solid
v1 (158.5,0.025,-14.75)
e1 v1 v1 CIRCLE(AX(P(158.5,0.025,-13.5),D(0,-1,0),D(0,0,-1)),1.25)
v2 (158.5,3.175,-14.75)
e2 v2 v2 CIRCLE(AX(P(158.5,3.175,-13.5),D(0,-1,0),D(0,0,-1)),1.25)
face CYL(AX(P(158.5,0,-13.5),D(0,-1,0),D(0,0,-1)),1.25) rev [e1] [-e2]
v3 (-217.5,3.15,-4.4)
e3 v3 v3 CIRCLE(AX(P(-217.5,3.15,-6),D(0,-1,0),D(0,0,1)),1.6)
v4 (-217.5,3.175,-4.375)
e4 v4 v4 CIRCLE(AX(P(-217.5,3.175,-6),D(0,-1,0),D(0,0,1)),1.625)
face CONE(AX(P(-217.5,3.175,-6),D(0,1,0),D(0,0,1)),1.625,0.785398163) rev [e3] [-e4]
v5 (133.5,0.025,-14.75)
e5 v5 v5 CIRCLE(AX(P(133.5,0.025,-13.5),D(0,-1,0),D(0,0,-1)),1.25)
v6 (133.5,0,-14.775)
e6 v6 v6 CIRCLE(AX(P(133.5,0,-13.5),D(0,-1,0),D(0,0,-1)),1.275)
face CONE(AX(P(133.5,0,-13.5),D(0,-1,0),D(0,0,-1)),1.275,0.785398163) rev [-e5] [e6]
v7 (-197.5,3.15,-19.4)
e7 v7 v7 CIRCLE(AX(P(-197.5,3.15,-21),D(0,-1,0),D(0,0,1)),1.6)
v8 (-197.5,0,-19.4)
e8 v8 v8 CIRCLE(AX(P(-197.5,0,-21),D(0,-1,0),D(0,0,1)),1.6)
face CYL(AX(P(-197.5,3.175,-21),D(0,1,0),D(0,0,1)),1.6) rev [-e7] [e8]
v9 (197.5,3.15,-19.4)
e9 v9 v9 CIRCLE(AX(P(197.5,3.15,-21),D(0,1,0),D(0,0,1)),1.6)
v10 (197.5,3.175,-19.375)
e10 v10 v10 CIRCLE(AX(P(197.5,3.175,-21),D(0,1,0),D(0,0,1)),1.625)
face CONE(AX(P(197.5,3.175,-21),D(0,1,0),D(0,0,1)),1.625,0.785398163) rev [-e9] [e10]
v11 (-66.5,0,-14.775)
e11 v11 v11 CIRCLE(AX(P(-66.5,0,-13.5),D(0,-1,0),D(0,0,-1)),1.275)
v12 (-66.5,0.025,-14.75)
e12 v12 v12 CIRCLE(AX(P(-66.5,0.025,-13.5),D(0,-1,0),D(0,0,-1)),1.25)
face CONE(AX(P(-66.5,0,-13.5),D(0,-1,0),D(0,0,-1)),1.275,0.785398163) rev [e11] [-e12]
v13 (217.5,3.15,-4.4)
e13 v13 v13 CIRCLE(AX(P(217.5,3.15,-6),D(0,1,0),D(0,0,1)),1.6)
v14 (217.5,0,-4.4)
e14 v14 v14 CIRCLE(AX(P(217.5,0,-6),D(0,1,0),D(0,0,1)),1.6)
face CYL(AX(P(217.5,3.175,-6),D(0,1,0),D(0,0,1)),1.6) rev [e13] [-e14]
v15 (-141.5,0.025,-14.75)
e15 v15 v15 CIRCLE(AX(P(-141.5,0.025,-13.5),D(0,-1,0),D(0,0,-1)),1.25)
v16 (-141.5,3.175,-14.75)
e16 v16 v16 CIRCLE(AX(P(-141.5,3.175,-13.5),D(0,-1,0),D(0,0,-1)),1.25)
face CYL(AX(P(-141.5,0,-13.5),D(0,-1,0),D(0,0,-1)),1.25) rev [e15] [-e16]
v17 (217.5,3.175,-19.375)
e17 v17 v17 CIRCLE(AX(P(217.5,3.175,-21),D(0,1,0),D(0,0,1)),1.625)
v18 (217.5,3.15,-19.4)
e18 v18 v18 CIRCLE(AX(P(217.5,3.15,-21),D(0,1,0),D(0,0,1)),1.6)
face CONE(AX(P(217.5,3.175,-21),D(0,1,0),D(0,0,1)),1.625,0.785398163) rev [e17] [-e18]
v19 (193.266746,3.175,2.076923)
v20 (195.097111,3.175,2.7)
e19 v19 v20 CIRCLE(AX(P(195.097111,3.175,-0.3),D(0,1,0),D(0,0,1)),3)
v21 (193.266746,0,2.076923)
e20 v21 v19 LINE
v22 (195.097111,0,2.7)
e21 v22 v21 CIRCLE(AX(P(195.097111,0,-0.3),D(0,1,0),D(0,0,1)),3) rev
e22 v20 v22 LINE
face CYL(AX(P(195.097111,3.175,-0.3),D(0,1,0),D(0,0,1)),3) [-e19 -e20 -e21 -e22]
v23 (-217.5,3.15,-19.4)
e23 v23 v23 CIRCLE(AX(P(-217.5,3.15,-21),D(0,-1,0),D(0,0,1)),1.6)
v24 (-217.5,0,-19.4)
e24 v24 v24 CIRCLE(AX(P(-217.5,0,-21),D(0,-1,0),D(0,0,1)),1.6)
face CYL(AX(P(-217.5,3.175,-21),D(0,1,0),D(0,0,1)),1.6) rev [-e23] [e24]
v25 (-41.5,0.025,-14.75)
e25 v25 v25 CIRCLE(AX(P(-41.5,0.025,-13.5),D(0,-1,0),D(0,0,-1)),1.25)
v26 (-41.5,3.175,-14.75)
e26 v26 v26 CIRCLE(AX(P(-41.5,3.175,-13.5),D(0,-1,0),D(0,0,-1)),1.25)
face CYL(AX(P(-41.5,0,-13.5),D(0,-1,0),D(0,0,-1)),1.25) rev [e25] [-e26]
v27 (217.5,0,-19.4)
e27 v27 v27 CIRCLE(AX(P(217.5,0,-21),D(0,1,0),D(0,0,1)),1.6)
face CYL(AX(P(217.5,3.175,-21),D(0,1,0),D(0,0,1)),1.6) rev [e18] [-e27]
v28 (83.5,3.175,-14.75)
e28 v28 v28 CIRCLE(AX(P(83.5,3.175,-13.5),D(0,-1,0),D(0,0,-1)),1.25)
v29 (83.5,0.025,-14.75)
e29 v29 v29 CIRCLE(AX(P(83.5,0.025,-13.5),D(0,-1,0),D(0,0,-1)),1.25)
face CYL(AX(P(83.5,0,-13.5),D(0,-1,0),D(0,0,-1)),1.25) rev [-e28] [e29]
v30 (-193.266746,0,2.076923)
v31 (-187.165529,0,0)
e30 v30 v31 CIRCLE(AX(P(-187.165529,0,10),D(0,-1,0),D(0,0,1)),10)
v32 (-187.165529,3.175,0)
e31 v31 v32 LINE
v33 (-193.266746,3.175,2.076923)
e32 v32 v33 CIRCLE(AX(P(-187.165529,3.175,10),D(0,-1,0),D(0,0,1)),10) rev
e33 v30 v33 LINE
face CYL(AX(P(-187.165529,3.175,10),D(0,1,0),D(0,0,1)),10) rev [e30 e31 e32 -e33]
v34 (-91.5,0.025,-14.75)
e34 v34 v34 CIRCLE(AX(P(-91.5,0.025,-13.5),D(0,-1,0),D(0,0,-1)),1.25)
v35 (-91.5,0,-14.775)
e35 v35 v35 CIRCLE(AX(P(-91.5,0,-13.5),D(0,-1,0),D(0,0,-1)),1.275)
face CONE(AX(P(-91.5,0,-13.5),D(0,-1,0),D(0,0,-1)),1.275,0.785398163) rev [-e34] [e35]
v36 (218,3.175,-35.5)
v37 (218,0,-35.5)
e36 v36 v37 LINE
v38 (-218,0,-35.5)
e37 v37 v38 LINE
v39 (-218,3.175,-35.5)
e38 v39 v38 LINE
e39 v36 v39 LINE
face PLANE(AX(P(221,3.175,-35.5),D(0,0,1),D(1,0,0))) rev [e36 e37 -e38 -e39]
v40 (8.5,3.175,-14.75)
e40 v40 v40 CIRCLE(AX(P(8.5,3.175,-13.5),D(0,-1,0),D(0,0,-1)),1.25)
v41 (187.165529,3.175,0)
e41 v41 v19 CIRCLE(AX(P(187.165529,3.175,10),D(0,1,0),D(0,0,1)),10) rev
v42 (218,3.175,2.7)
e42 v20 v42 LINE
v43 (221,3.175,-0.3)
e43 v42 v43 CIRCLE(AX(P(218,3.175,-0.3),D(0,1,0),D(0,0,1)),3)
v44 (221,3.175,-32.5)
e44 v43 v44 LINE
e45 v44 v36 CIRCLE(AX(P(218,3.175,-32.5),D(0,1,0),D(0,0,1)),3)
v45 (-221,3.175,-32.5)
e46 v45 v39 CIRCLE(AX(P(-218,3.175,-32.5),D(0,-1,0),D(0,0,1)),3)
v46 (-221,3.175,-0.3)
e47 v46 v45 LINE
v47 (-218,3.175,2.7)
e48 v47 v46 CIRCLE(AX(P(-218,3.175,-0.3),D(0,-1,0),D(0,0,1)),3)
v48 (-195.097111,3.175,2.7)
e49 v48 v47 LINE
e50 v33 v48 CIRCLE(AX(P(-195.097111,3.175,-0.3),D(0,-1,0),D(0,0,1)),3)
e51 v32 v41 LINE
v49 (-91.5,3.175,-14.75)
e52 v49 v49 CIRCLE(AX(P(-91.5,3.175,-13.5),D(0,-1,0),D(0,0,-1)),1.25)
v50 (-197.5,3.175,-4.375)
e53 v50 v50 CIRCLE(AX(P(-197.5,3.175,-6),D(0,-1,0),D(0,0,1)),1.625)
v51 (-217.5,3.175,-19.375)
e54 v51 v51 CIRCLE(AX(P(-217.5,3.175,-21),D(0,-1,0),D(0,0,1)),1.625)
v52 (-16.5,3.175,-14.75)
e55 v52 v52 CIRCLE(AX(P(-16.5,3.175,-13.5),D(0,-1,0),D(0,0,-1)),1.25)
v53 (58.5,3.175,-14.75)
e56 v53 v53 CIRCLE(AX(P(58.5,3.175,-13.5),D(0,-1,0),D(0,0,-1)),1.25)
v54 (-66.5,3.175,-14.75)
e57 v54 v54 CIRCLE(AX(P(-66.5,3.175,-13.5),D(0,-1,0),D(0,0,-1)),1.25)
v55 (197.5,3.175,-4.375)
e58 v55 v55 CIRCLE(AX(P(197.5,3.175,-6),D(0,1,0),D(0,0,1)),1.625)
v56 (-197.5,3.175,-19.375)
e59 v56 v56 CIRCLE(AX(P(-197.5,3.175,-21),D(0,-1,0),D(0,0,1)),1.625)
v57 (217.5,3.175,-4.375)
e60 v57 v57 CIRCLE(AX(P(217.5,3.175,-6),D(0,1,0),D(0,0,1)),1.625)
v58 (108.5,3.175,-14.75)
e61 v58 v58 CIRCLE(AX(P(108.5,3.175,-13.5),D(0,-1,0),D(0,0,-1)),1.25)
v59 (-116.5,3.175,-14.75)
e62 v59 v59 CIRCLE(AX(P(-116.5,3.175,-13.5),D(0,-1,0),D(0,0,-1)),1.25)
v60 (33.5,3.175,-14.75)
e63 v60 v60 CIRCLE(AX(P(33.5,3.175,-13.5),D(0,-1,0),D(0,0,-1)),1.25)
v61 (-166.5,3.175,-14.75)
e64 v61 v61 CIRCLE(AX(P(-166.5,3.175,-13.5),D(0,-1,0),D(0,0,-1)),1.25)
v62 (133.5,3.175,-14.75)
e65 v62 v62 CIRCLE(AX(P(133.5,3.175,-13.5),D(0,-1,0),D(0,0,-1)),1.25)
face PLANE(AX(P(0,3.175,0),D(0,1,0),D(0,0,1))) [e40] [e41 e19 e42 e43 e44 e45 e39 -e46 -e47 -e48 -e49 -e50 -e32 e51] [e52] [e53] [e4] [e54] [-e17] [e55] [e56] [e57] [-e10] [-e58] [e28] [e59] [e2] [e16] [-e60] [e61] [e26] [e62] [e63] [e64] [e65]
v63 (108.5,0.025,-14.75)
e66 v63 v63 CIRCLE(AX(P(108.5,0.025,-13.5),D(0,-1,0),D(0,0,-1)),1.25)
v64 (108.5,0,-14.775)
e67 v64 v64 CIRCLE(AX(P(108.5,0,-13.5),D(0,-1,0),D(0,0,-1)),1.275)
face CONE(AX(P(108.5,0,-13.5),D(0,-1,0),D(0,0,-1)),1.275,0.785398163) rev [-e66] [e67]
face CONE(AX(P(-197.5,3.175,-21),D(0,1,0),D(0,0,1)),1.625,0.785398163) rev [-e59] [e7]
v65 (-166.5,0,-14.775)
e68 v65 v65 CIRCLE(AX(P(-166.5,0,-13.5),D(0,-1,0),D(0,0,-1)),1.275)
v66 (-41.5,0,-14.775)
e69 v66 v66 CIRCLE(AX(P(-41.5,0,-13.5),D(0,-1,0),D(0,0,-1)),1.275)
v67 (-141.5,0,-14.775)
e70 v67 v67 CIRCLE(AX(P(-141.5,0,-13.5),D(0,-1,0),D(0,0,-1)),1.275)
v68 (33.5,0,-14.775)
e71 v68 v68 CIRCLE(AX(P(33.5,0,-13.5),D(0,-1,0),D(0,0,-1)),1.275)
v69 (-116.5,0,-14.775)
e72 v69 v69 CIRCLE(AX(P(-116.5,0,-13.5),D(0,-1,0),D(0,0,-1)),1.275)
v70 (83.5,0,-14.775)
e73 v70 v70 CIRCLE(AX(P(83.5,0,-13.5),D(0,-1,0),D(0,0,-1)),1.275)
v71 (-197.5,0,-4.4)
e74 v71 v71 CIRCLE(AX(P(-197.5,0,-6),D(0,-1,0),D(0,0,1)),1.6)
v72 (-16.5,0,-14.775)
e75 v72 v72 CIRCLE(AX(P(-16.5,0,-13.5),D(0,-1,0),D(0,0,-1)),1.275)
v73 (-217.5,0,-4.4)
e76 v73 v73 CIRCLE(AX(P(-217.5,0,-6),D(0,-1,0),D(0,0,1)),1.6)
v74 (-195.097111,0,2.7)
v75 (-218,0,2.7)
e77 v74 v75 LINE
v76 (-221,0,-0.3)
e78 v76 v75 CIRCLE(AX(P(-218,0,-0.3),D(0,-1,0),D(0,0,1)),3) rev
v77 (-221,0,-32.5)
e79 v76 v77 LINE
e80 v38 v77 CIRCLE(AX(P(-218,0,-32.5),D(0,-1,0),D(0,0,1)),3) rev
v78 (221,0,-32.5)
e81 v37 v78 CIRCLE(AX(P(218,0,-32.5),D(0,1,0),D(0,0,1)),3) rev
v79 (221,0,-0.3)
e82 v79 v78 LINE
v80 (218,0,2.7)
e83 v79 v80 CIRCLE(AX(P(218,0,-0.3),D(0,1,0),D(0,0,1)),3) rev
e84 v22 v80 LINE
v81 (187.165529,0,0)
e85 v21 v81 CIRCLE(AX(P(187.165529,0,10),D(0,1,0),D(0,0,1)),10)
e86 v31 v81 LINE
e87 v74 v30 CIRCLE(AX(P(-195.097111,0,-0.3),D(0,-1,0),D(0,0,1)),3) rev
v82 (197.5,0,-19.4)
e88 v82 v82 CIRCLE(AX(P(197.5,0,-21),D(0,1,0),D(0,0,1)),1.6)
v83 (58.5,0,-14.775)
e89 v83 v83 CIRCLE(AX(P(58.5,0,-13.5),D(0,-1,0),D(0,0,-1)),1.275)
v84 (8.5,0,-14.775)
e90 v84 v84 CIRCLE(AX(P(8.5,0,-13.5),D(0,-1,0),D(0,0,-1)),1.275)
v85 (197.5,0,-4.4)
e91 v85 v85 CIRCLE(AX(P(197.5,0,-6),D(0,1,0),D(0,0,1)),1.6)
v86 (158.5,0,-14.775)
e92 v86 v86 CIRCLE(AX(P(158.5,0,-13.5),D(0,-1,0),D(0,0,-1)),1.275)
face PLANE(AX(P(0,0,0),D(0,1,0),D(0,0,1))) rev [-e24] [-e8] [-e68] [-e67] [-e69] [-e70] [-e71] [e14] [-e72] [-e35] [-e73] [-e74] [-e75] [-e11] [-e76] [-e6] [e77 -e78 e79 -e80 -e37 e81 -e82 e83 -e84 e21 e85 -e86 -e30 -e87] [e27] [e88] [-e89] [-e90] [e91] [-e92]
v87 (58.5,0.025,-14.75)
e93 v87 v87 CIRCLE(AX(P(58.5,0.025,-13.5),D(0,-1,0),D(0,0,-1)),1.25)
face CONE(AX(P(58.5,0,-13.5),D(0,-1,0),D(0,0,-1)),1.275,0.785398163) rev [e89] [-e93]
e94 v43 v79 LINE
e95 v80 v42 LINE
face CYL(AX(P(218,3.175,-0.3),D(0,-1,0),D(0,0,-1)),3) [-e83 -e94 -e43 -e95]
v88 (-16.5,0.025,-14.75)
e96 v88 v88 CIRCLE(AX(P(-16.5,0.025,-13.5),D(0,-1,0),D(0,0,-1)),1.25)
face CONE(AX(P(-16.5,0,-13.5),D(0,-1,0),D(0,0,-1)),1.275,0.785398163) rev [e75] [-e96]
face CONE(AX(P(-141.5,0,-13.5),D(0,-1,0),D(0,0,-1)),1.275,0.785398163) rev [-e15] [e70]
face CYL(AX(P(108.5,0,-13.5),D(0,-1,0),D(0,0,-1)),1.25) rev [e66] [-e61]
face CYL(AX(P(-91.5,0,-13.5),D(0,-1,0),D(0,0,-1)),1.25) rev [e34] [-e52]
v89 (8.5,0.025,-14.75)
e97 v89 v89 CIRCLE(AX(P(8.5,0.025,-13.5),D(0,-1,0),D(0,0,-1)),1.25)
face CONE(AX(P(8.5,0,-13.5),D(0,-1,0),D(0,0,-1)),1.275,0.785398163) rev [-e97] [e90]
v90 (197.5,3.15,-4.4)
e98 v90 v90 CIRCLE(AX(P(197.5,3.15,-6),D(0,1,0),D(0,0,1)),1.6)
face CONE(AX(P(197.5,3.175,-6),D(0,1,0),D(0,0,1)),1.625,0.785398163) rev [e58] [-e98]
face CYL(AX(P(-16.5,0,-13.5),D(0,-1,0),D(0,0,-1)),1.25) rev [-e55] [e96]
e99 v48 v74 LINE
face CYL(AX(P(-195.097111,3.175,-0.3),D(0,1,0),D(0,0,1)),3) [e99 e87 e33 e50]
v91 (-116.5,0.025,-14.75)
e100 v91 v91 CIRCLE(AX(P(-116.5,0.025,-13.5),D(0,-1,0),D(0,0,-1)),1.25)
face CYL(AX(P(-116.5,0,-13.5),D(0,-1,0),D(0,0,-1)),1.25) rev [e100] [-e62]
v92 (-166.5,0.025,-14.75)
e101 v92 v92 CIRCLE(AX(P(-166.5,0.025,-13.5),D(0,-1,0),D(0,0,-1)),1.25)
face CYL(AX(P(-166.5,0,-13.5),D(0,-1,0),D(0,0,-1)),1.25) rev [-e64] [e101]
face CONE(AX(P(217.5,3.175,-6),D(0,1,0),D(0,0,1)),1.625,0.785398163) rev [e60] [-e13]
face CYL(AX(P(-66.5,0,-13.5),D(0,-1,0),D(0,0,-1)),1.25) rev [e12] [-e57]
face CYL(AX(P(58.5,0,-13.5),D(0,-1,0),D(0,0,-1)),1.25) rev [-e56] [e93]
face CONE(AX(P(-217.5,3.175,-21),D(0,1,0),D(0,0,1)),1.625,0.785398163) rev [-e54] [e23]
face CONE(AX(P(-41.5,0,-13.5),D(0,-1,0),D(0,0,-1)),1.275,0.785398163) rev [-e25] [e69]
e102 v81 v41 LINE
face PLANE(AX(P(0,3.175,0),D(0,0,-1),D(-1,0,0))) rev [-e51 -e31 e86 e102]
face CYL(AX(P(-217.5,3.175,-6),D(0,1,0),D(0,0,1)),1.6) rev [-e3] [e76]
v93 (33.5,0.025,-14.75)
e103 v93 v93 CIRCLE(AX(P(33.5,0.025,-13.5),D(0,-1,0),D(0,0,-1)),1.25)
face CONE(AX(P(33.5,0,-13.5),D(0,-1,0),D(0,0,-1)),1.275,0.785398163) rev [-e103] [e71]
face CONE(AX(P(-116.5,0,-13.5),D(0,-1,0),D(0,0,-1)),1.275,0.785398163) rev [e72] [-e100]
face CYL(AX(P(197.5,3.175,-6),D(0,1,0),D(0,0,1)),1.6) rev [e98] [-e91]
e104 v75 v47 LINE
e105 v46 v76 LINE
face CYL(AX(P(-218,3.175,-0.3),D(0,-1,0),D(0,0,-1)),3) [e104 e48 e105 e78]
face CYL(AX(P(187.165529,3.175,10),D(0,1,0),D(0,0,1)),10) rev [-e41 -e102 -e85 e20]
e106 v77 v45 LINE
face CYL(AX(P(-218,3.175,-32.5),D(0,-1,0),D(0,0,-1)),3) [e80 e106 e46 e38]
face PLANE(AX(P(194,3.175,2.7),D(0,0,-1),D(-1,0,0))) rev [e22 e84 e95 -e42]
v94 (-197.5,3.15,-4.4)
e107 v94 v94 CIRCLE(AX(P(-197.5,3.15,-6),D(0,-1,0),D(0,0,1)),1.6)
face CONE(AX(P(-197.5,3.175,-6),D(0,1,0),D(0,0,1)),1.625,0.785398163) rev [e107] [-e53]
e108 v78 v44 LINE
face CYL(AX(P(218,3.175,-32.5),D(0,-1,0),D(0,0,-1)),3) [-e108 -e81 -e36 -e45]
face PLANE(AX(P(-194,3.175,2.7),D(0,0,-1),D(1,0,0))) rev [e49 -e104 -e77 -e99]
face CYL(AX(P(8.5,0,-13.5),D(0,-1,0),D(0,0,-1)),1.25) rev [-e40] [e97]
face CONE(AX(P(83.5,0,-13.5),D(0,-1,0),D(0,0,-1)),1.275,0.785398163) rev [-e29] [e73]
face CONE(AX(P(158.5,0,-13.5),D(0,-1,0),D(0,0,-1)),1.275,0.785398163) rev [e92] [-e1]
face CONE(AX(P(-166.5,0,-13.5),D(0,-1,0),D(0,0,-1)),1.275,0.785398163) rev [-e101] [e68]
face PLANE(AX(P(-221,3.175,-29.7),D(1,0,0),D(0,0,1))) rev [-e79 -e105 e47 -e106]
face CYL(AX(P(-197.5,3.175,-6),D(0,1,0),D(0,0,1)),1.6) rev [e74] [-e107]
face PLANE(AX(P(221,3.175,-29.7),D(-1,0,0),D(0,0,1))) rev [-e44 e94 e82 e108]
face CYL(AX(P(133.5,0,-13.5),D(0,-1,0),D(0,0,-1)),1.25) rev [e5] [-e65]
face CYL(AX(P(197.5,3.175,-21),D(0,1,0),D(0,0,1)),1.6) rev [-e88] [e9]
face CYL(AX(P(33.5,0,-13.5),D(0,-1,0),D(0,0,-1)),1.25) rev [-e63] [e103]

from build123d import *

# Parameters (mm, degrees)
BOSS_EXTRUDE1_DEPTH                   = 3.175
M3_CLEARANCE_HOLE1_D                  = 3.2
M3_CLEARANCE_HOLE1_CSINK_D            = 3.25
M3_CLEARANCE_HOLE1_CSINK_ANGLE        = 90
FILLET1_R                             = 10
FILLET2_R                             = 3
TAP_DRILL_FOR_M3X0_5_TAP2_D           = 2.5
TAP_DRILL_FOR_M3X0_5_TAP2_CSINK_D     = 2.55
TAP_DRILL_FOR_M3X0_5_TAP2_CSINK_ANGLE = 90
LPATTERN1_COUNT                       = 14
LPATTERN1_PITCH                       = 25


with BuildPart() as part:
    # Sketch1 → Boss-Extrude1 (new body)
    with BuildSketch(Plane(origin=(0, 0, 0), x_dir=(1, 0, 0), z_dir=(0, 1, 0))):
        Polygon((0, 0), (194, 0), (194, -2.7), (221, -2.7), (221, 29.7), (221, 35.5), (0, 35.5), (0, 29.7), align=None)
    extrude(amount=BOSS_EXTRUDE1_DEPTH)

    # M3 Clearance Hole1 (through all)
    with Locations(Plane(origin=(0, 3.175, 0), x_dir=(1, 0, 0), z_dir=(0, 1, 0))):
        with Locations((197.5, 21), (217.5, 6), (217.5, 21), (197.5, 6)):
            CounterSinkHole(M3_CLEARANCE_HOLE1_D / 2, M3_CLEARANCE_HOLE1_CSINK_D / 2, counter_sink_angle=M3_CLEARANCE_HOLE1_CSINK_ANGLE)

    # Fillet1
    # the kernel refuses this fillet: 10 mm, written as the material it adds along each edge
    with BuildSketch(Plane(origin=(194, 0, 0), x_dir=(-1, 0, 0), z_dir=(0, 1, 0))) as fillet1_piece_1:
        with BuildLine():
            CenterArc((6.83447145, 10), FILLET1_R, 226.886394054, 43.113605946)
            Line((0, 2.7), (-0.136689429, 2.554))
            ThreePointArc((-0.136689429, 2.554), (-0.2, 1.35), (-0.2, 0))
            Line((-0.2, 0), (0, -0.2))
            Line((0, -0.2), (6.83447145, -0.2))
            Line((6.83447145, -0.2), (6.83447145, 0))
        make_face()
    extrude(amount=3.175)

    # Fillet2
    fillet2_edges = [part.edges().sort_by_distance(p)[0] for p in [
        (221, 1.5875, -35.5),
        (221, 1.5875, 2.7),
        (194, 1.5875, 2.7),
    ]]
    fillet(fillet2_edges, radius=FILLET2_R)

    # Mirror1: part across plane


with BuildPart() as part_1:
    add(part.part)
    add(part.part.mirror(Plane(origin=(0, 3.175, -35.5), x_dir=(0, 0, 1), z_dir=(1, 0, 0))))

    # Tap Drill for M3x0.5 Tap2 (through all)
    with Locations(Plane(origin=(0, 0, 0), x_dir=(-1, 0, 0), z_dir=(0, -1, 0))):
        with Locations((166.5, 13.5)):
            tap_drill_for_m3x0_5_tap2 = CounterSinkHole(TAP_DRILL_FOR_M3X0_5_TAP2_D / 2, TAP_DRILL_FOR_M3X0_5_TAP2_CSINK_D / 2, counter_sink_angle=TAP_DRILL_FOR_M3X0_5_TAP2_CSINK_ANGLE)

    # LPattern1: Tap Drill for M3x0.5 Tap2 ×14
    with Locations(*[(i * LPATTERN1_PITCH, 0, 0) for i in range(1, LPATTERN1_COUNT)]):
        add(tap_drill_for_m3x0_5_tap2, mode=Mode.SUBTRACT)


solid = part_1.part
